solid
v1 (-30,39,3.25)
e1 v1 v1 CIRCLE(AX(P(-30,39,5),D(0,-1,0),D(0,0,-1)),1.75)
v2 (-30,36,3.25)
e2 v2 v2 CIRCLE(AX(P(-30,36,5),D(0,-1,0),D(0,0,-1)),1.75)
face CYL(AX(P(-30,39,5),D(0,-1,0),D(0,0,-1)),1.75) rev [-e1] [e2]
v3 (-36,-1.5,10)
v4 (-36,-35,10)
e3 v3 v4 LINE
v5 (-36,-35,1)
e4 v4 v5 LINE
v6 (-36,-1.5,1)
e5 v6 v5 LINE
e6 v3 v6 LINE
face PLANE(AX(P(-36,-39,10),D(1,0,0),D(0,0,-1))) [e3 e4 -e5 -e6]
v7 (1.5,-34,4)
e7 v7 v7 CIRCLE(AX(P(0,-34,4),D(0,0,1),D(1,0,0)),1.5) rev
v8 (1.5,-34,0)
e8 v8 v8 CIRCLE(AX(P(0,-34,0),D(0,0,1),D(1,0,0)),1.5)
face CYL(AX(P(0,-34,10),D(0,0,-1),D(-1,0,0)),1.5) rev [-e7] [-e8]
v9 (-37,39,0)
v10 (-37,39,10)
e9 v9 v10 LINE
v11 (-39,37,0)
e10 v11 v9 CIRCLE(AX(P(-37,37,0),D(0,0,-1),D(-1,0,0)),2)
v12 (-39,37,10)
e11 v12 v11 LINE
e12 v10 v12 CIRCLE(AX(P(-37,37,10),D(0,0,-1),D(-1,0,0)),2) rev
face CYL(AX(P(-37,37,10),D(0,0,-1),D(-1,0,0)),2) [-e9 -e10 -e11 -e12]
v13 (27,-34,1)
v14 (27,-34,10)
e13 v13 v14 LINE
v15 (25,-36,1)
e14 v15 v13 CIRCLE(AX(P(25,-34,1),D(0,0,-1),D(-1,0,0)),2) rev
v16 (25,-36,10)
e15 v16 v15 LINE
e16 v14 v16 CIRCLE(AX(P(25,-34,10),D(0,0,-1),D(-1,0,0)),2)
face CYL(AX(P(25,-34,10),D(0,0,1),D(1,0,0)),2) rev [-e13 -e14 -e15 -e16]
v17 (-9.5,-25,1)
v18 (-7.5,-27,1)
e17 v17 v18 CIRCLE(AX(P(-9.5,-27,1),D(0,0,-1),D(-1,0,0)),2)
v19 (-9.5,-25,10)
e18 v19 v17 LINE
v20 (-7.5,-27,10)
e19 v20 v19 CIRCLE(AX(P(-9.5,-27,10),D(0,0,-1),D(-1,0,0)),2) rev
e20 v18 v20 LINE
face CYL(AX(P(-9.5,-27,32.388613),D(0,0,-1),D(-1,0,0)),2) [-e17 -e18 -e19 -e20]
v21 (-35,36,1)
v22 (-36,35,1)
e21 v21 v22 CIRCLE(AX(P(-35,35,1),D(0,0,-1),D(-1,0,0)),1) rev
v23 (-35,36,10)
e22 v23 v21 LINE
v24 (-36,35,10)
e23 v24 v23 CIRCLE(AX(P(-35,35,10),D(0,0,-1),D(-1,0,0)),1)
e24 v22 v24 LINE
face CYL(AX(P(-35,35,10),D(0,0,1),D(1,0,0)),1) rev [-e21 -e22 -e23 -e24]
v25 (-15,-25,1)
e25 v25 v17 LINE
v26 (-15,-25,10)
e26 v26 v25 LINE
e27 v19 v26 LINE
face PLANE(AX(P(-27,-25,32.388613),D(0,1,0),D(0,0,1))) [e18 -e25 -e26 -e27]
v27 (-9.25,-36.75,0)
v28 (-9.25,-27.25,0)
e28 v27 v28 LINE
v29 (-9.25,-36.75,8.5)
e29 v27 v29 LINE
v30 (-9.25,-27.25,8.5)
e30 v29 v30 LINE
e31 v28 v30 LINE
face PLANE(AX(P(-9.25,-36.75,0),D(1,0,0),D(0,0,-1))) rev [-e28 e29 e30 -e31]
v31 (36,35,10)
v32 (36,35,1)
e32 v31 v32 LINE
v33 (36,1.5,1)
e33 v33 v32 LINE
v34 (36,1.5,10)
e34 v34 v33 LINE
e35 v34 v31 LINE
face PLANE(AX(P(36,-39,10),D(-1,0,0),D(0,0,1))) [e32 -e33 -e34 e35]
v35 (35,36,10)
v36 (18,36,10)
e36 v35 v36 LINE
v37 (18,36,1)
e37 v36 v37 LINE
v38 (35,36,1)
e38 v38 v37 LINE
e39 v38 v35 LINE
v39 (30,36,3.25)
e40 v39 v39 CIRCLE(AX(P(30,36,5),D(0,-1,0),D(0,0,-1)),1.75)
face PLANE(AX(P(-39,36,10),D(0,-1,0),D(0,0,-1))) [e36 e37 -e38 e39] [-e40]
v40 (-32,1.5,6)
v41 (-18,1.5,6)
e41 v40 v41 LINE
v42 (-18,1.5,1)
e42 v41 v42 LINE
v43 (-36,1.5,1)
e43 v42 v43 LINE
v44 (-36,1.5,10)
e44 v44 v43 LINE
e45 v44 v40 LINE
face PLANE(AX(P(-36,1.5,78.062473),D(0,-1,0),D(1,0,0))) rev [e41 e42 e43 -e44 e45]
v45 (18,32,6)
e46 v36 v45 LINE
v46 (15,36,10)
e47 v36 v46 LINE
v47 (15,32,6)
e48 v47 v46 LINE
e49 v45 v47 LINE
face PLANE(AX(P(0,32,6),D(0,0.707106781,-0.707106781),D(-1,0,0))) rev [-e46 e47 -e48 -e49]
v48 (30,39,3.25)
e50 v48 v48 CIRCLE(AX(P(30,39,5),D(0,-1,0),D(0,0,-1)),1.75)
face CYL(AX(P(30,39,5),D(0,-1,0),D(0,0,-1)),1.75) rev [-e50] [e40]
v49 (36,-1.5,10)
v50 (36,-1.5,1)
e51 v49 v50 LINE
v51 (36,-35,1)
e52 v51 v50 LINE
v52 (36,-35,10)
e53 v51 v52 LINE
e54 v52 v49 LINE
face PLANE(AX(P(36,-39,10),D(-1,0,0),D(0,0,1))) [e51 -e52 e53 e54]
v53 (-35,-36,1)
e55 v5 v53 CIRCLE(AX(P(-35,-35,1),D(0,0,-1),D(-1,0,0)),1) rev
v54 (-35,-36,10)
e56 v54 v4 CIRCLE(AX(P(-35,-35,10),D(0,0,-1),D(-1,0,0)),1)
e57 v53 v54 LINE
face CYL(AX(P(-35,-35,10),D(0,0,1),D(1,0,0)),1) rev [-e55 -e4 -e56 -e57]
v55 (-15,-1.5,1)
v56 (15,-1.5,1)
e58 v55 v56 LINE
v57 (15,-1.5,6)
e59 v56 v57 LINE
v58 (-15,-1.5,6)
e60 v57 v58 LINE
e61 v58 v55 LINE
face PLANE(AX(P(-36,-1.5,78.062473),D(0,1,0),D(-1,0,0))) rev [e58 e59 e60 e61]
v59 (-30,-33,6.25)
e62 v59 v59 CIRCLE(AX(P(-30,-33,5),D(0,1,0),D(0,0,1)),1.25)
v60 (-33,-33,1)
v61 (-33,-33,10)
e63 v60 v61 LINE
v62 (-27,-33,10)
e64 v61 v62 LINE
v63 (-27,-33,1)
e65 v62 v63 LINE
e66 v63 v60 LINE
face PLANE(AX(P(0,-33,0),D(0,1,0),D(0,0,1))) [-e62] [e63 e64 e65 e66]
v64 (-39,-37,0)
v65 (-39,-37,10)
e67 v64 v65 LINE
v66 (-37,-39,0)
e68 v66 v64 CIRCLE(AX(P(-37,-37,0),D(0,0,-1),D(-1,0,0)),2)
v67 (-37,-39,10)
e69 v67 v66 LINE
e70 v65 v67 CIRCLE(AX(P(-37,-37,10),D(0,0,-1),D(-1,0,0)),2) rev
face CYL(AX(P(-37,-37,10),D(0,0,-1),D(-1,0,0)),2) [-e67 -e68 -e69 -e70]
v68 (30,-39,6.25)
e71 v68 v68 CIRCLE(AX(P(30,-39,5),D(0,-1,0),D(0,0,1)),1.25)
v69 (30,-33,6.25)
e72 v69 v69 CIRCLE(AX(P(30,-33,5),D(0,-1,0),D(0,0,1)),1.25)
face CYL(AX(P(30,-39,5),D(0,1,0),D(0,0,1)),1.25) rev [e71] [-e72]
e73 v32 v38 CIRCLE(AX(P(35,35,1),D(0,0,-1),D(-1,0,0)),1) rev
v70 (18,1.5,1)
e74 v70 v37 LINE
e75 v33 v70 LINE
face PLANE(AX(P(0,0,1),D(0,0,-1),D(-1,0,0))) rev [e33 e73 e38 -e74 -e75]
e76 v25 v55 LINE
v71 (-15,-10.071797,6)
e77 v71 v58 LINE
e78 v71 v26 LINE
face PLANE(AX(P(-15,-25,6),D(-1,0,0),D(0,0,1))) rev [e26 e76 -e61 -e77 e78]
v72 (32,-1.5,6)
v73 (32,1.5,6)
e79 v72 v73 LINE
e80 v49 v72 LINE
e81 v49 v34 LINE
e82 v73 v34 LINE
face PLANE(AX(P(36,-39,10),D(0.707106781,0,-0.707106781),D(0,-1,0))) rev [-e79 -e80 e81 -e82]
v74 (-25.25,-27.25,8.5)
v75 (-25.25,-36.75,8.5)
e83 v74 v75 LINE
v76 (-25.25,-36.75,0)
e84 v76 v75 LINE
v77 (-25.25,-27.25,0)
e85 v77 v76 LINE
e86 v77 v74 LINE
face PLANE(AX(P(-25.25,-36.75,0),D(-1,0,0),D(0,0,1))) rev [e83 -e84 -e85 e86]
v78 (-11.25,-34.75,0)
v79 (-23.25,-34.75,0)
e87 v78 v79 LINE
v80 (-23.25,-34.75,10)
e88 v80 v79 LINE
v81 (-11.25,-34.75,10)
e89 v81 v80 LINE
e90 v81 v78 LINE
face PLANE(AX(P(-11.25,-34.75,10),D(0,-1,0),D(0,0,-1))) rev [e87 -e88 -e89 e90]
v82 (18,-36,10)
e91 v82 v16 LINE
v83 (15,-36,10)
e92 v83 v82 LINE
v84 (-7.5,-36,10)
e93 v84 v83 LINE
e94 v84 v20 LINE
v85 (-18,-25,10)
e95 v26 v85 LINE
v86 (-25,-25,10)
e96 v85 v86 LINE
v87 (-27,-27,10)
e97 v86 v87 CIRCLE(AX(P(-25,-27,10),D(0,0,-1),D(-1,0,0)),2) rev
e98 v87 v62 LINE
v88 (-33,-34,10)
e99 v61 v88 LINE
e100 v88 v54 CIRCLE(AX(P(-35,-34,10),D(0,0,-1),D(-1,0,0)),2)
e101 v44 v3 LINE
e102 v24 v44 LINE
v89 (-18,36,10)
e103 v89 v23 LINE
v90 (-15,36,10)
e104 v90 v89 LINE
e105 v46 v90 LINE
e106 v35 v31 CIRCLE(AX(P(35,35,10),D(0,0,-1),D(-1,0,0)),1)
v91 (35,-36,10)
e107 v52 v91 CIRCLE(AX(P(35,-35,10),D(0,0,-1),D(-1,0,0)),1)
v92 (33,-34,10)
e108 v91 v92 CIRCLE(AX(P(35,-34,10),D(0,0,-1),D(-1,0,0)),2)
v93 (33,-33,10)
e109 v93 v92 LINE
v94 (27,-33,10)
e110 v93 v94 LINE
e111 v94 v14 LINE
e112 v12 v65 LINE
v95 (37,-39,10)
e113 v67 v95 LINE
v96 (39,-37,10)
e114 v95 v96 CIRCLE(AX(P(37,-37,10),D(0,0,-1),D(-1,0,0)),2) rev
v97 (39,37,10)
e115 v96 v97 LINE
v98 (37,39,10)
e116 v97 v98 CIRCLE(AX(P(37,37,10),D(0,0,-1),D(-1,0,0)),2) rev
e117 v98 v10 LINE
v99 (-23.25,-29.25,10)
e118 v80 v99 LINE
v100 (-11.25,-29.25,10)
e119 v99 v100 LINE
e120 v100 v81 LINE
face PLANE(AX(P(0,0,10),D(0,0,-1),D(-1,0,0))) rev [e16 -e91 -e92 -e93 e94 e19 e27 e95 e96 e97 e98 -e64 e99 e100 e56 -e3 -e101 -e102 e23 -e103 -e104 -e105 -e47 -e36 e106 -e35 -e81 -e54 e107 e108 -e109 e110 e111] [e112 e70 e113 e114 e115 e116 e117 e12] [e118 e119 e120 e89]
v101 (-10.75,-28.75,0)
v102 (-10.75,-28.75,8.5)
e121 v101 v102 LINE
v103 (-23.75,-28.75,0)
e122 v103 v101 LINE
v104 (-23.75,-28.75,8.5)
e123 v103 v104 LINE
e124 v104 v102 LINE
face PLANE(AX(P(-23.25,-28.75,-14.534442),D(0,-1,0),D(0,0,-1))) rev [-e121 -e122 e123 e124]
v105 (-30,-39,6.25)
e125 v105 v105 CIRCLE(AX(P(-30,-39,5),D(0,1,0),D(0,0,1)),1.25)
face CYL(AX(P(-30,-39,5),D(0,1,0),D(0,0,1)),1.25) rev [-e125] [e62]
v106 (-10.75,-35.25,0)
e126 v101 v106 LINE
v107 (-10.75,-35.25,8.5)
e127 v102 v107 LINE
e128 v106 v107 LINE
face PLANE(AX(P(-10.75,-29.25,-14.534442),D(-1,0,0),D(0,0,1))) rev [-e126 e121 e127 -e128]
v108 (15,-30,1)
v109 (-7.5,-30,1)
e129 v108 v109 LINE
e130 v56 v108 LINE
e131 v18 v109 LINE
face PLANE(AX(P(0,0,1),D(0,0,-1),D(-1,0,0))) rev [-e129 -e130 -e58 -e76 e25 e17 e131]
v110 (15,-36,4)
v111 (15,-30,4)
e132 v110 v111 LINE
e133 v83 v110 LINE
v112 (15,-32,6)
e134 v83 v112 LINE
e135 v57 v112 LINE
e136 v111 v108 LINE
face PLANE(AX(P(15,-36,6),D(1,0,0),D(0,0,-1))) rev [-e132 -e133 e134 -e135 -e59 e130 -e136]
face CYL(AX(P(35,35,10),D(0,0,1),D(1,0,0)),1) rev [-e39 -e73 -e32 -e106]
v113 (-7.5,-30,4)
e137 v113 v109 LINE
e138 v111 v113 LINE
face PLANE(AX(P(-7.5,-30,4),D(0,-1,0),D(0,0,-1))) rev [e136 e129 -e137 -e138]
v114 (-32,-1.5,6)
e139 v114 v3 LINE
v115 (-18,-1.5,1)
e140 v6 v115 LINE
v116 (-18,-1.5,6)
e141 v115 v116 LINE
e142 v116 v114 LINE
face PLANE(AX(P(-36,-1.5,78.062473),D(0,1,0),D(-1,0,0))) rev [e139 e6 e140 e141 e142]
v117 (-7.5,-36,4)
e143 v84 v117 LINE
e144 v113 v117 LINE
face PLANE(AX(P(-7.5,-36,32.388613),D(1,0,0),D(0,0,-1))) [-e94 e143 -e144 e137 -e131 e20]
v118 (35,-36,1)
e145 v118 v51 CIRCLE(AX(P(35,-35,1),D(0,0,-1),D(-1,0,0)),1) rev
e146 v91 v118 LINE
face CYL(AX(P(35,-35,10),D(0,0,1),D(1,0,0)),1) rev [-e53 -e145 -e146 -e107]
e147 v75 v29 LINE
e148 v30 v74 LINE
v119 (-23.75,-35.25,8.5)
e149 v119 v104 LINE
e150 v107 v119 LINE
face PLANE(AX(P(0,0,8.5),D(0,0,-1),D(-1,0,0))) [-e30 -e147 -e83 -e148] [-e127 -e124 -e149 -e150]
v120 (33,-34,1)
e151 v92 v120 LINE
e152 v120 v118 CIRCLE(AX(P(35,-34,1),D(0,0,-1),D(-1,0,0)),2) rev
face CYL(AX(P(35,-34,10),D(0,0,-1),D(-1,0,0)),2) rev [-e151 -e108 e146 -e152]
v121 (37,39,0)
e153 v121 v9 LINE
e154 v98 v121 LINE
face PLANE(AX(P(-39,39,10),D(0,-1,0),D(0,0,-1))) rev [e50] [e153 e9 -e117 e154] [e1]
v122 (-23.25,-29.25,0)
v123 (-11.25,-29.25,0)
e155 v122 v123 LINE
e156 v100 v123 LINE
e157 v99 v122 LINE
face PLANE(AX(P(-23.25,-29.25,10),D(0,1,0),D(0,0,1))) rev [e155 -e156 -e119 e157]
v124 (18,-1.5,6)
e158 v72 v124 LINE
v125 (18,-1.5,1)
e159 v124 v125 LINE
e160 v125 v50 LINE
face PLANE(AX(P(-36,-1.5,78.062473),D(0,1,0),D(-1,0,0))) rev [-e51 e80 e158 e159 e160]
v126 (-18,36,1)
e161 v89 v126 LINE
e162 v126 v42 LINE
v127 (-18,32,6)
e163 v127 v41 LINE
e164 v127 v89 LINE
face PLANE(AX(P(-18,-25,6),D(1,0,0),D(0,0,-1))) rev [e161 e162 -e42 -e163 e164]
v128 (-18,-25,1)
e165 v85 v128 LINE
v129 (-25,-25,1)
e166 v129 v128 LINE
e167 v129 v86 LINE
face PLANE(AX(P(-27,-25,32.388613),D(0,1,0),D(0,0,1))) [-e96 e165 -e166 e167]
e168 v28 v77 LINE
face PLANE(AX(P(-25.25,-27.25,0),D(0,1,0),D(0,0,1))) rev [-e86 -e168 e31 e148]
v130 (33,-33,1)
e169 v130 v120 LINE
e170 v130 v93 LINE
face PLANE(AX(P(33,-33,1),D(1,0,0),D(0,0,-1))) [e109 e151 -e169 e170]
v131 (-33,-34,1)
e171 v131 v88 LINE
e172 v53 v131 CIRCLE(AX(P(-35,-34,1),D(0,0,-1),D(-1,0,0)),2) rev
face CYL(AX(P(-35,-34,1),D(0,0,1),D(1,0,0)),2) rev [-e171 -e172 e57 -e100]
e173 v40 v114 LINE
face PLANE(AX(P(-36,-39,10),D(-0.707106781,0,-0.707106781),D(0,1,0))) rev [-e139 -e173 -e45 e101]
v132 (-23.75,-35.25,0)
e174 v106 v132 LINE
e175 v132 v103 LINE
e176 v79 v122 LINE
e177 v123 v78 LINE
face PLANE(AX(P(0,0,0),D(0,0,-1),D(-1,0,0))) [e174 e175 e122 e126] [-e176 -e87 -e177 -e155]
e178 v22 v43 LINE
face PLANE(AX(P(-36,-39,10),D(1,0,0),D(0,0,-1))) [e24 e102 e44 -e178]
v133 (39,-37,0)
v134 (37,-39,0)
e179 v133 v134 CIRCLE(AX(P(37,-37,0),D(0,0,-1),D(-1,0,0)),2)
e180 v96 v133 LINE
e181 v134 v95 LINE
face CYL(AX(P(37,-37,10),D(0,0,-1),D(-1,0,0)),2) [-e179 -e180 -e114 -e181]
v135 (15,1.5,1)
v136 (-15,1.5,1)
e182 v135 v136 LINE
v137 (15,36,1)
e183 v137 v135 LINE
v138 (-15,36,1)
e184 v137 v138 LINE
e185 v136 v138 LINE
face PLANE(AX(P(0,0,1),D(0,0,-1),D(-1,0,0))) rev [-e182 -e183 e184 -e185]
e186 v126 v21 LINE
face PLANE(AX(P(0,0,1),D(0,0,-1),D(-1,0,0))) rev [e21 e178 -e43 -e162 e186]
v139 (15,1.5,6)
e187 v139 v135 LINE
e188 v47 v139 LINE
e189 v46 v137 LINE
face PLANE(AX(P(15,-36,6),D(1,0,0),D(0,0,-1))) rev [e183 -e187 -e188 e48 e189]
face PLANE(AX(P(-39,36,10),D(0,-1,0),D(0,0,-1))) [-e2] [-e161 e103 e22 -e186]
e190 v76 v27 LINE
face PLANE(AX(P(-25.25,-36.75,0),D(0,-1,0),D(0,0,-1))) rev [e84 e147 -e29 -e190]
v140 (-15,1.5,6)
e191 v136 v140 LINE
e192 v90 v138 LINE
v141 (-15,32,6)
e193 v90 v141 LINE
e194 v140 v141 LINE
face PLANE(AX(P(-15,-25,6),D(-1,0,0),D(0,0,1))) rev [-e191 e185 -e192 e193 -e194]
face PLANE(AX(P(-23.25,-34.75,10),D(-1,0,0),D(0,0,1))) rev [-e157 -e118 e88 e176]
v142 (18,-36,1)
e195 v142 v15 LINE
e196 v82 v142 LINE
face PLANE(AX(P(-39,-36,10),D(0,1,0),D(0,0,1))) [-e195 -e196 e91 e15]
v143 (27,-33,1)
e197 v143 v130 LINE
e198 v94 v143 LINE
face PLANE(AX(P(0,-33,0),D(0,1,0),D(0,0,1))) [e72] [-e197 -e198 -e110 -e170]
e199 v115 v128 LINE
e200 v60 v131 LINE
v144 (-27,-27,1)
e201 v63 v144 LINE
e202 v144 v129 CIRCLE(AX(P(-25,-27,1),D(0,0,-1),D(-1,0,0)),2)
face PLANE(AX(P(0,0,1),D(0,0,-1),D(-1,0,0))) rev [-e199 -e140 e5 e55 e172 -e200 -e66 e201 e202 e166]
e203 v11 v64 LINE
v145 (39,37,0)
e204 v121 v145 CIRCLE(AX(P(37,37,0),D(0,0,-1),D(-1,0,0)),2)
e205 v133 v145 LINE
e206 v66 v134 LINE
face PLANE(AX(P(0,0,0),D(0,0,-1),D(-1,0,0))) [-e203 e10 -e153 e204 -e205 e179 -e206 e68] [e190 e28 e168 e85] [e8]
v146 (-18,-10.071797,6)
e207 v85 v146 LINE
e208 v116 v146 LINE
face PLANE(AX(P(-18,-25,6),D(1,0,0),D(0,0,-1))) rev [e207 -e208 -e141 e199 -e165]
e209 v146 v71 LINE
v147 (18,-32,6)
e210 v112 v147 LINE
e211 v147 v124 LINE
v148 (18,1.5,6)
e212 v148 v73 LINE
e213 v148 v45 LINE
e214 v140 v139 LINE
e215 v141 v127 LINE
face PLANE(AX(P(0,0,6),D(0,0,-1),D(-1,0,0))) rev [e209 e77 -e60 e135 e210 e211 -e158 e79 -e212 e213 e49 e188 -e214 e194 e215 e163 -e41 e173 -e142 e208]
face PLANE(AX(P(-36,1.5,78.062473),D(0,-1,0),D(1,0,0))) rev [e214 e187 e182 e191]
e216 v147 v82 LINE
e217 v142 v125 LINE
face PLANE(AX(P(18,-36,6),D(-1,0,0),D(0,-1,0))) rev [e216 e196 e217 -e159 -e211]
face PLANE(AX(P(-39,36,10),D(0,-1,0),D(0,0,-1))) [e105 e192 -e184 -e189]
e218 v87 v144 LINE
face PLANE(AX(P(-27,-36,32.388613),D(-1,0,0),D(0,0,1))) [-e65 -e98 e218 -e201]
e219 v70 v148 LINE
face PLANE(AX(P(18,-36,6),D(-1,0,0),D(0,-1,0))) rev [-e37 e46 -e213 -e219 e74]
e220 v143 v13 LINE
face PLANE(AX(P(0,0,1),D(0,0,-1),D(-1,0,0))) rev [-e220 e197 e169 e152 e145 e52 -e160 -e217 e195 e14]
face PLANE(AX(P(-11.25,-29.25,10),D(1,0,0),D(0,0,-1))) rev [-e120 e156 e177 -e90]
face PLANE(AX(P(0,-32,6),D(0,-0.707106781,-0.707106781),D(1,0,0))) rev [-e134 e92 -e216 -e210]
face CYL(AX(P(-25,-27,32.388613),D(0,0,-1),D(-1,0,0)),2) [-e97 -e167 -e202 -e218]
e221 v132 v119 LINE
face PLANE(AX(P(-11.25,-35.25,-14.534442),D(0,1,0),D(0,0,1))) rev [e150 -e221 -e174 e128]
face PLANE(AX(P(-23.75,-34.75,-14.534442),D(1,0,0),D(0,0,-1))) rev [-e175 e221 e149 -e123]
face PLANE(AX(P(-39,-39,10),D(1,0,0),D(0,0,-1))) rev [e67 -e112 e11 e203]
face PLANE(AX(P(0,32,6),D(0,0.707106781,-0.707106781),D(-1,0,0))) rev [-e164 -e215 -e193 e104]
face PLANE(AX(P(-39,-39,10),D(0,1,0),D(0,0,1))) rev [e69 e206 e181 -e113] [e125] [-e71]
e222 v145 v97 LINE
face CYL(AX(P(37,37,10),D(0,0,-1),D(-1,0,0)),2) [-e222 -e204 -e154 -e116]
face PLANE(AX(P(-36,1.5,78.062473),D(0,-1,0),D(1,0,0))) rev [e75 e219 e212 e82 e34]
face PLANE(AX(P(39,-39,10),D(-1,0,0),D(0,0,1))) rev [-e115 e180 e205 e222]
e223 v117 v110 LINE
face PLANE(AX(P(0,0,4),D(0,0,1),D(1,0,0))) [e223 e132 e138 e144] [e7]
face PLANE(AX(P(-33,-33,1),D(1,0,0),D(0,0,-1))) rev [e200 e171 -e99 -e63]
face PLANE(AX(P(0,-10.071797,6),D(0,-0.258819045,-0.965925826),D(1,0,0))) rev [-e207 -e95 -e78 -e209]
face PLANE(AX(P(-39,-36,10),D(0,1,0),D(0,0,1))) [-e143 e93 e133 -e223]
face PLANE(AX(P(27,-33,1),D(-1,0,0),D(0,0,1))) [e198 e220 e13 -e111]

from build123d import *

# Parameters (mm, degrees)
SKETCH1_W                 = 78
SKETCH1_H                 = 78
BOSS_EXTRUDE1_DEPTH       = 10
SHELL1_T                  = -3
SHELL1_THICKNESS_2_FACE_W = 72
SHELL1_THICKNESS_2_FACE_H = 72
SHELL1_THICKNESS_2_DEPTH  = 2
SKETCH10_R                = 1.25
CUT_EXTRUDE7_DEPTH        = 57.053545829
FILLET5_R                 = 2
FILLET6_R                 = 1
BOSS_EXTRUDE2_START       = 3
SKETCH15_W                = 6
SKETCH15_H                = 9
SKETCH15_R                = 1.25
BOSS_EXTRUDE2_DEPTH       = 3
FILLET7_R                 = 2
FILLET7_OF_MIRROR5_R      = 2
SKETCH16_R                = 1.75
CUT_EXTRUDE9_DEPTH        = 86.12343978
SKETCH20_W                = 19.5
SKETCH20_H                = 11
BOSS_EXTRUDE3_DEPTH       = 10
CUT_EXTRUDE10_START       = -1.5
SKETCH21_W                = 16
SKETCH21_H                = 9.5
CUT_EXTRUDE10_DEPTH       = 55.553545829
SKETCH22_W                = 12
SKETCH22_H                = 5.5
CUT_EXTRUDE11_DEPTH       = 56.805465682
SKETCH22_2_W              = 13
SKETCH22_2_H              = 6.5
SKETCH22_2_W_2            = 12
SKETCH22_2_H_2            = 5.5
EXTRUDE_THIN3_DEPTH       = 8.5
FILLET8_R                 = 2
SKETCH26_W                = 22.5
SKETCH26_H                = 6
BOSS_EXTRUDE4_DEPTH       = 3
SKETCH13_R                = 1.5
CUT_EXTRUDE8_DEPTH        = 57.053545829
SKETCH28_W                = 3
SKETCH28_H                = 61
SKETCH28_H_2              = 72
BOSS_EXTRUDE5_DEPTH       = 5
SKETCH29_W                = 72
SKETCH29_H                = 3
BOSS_EXTRUDE6_DEPTH       = 5
CHAMFER1_SIZE2            = 14.92820323
CHAMFER1_SIZE             = 4
CHAMFER2_SIZE             = 4


with BuildPart() as part:
    # Sketch1 → Boss-Extrude1 (new body)
    with BuildSketch(Plane.XY):
        Rectangle(SKETCH1_W, SKETCH1_H)
    extrude(amount=BOSS_EXTRUDE1_DEPTH)

    # Shell1
    shell1_openings = [part.faces().sort_by_distance(p)[0] for p in [
        (0, 0, 10),
    ]]
    offset(amount=SHELL1_T, openings=shell1_openings, kind=Kind.INTERSECTION)

    # Shell1 thickness 2 face (on inner face of the shell) → Shell1 thickness 2 (cut)
    with BuildSketch(Plane(origin=(0, 0, 3), x_dir=(-1, 0, 0), z_dir=(0, 0, -1))):
        Rectangle(SHELL1_THICKNESS_2_FACE_W, SHELL1_THICKNESS_2_FACE_H)
    extrude(amount=SHELL1_THICKNESS_2_DEPTH, mode=Mode.SUBTRACT)

    # Sketch10 → Cut-Extrude7 (cut, symmetric)
    with BuildSketch(Plane(origin=(0, 0, 0), x_dir=(1, 0, 0), z_dir=(0, 1, 0))):
        with Locations(Location((-30, -5, 0), (0, 0, 270))):
            Circle(SKETCH10_R)
    cut_extrude7 = extrude(amount=CUT_EXTRUDE7_DEPTH, both=True, mode=Mode.SUBTRACT)

    # Mirror4: Cut-Extrude7 across plane
    add(cut_extrude7.mirror(Plane(origin=(0, 0, 0), x_dir=(0, 0, 1), z_dir=(1, 0, 0))), mode=Mode.SUBTRACT)

    # Fillet5
    fillet5_edges = [part.edges().sort_by_distance(p)[0] for p in [
        (39, -39, 5),
        (-39, -39, 5),
        (-39, 39, 5),
        (39, 39, 5),
    ]]
    fillet(fillet5_edges, radius=FILLET5_R)

    # Fillet6
    fillet6_edges = [part.edges().sort_by_distance(p)[0] for p in [
        (36, -36, 5.5),
        (36, 36, 5.5),
        (-36, 36, 5.5),
        (-36, -36, 5.5),
    ]]
    fillet(fillet6_edges, radius=FILLET6_R)

    # Sketch15 → Boss-Extrude2 (add)
    with BuildSketch(Plane(origin=(0, -36, 0), x_dir=(1, 0, 0), z_dir=(0, 1, 0)).offset(BOSS_EXTRUDE2_START)):
        with Locations((-30, -5.5)):
            Rectangle(SKETCH15_W, SKETCH15_H)
        with Locations(Location((-30, -5, 0), (0, 0, 270))):
            Circle(SKETCH15_R, mode=Mode.SUBTRACT)
    boss_extrude2 = extrude(amount=-BOSS_EXTRUDE2_DEPTH)

    # Fillet7
    fillet7_edges = [part.edges().sort_by_distance(p)[0] for p in [
        (-33, -36, 5.5),
        (-27, -36, 5.5),
    ]]
    fillet(fillet7_edges, radius=FILLET7_R - 0.0001)  # a hair under: the kernel refuses the full size

    # Mirror5: Boss-Extrude2 across plane
    add(boss_extrude2.mirror(Plane(origin=(0, 0, 0), x_dir=(0, 0, 1), z_dir=(1, 0, 0))))

    # Fillet7 of Mirror5
    fillet7_of_mirror5_edges = [part.edges().sort_by_distance(p)[0] for p in [
        (33, -36, 5.5),
        (27, -36, 5.5),
    ]]
    fillet(fillet7_of_mirror5_edges, radius=FILLET7_OF_MIRROR5_R - 0.0001)  # a hair under: the kernel refuses the full size

    # Sketch16 → Cut-Extrude9 (cut, through all)
    with BuildSketch(Plane.XZ.offset(-36)):
        with Locations(Location((-30, 5, 0), (0, 0, 270))):
            Circle(SKETCH16_R)
        with Locations(Location((30, 5, 0), (0, 0, 270))):
            Circle(SKETCH16_R)
    extrude(amount=-CUT_EXTRUDE9_DEPTH, mode=Mode.SUBTRACT)

    # Sketch20 → Boss-Extrude3 (add)
    with BuildSketch(Plane(origin=(0, 0, 0), x_dir=(-1, 0, 0), z_dir=(0, 0, -1))):
        with Locations((17.25, -30.5)):
            Rectangle(SKETCH20_W, SKETCH20_H)
    extrude(amount=-BOSS_EXTRUDE3_DEPTH)

    # Sketch21 → Cut-Extrude10 (cut, through all)
    with BuildSketch(Plane.XY.offset(10).offset(CUT_EXTRUDE10_START)):
        with Locations((-17.25, -32)):
            Rectangle(SKETCH21_W, SKETCH21_H)
    extrude(amount=-CUT_EXTRUDE10_DEPTH, mode=Mode.SUBTRACT)

    # Sketch22 → Cut-Extrude11 (cut, through all)
    with BuildSketch(Plane(origin=(0, 0, 8.5), x_dir=(-1, 0, 0), z_dir=(0, 0, -1))):
        with Locations((17.25, -32)):
            Rectangle(SKETCH22_W, SKETCH22_H)
    extrude(amount=-CUT_EXTRUDE11_DEPTH, mode=Mode.SUBTRACT)

    # Sketch22<2> → Extrude-Thin3 (add)
    with BuildSketch(Plane(origin=(0, 0, 8.5), x_dir=(-1, 0, 0), z_dir=(0, 0, -1))):
        with Locations((17.25, -32)):
            Rectangle(SKETCH22_2_W, SKETCH22_2_H)
        with Locations((17.25, -32)):
            Rectangle(SKETCH22_2_W_2, SKETCH22_2_H_2, mode=Mode.SUBTRACT)
    extrude(amount=EXTRUDE_THIN3_DEPTH)

    # Fillet8
    fillet8_edges = [part.edges().sort_by_distance(p)[0] for p in [
        (-7.5, -25, 5.5),
        (-27, -25, 5.5),
    ]]
    fillet(fillet8_edges, radius=FILLET8_R)

    # Sketch26 → Boss-Extrude4 (add)
    with BuildSketch(Plane.XY.offset(1)):
        with Locations((3.75, -33)):
            Rectangle(SKETCH26_W, SKETCH26_H)
    extrude(amount=BOSS_EXTRUDE4_DEPTH)

    # Sketch13 → Cut-Extrude8 (cut, through all)
    with BuildSketch(Plane.XY):
        with Locations((0, -34)):
            Circle(SKETCH13_R)
    extrude(amount=CUT_EXTRUDE8_DEPTH, mode=Mode.SUBTRACT)

    # Sketch28 → Boss-Extrude5 (add)
    with BuildSketch(Plane.XY.offset(1)):
        with Locations((-16.5, 5.5)):
            Rectangle(SKETCH28_W, SKETCH28_H)
        with Locations((16.5, 0)):
            Rectangle(SKETCH28_W, SKETCH28_H_2)
    extrude(amount=BOSS_EXTRUDE5_DEPTH)

    # Sketch29 → Boss-Extrude6 (add)
    with BuildSketch(Plane.XY.offset(1)):
        Rectangle(SKETCH29_W, SKETCH29_H)
    extrude(amount=BOSS_EXTRUDE6_DEPTH)

    # Chamfer1
    chamfer1_edges = [part.edges().sort_by_distance(p)[0] for p in [
        (-16.5, -25, 6),
    ]]
    chamfer1_side = [part.faces().sort_by_distance(p)[0] for p in [
        (-16.5, -25, 6.08),
    ]]
    chamfer(chamfer1_edges, length=CHAMFER1_SIZE - 0.0001, length2=CHAMFER1_SIZE2 - 0.0001, reference=chamfer1_side[0])  # a hair under: the kernel refuses the full size

    # Chamfer2
    chamfer2_edges = [part.edges().sort_by_distance(p)[0] for p in [
        (-16.5, 36, 6),
        (16.5, -36, 6),
        (16.5, 36, 6),
        (36, 0, 6),
        (-36, 0, 6),
    ]]
    chamfer(chamfer2_edges, length=CHAMFER2_SIZE - 0.0001)  # a hair under: the kernel refuses the full size


solid = part.part
